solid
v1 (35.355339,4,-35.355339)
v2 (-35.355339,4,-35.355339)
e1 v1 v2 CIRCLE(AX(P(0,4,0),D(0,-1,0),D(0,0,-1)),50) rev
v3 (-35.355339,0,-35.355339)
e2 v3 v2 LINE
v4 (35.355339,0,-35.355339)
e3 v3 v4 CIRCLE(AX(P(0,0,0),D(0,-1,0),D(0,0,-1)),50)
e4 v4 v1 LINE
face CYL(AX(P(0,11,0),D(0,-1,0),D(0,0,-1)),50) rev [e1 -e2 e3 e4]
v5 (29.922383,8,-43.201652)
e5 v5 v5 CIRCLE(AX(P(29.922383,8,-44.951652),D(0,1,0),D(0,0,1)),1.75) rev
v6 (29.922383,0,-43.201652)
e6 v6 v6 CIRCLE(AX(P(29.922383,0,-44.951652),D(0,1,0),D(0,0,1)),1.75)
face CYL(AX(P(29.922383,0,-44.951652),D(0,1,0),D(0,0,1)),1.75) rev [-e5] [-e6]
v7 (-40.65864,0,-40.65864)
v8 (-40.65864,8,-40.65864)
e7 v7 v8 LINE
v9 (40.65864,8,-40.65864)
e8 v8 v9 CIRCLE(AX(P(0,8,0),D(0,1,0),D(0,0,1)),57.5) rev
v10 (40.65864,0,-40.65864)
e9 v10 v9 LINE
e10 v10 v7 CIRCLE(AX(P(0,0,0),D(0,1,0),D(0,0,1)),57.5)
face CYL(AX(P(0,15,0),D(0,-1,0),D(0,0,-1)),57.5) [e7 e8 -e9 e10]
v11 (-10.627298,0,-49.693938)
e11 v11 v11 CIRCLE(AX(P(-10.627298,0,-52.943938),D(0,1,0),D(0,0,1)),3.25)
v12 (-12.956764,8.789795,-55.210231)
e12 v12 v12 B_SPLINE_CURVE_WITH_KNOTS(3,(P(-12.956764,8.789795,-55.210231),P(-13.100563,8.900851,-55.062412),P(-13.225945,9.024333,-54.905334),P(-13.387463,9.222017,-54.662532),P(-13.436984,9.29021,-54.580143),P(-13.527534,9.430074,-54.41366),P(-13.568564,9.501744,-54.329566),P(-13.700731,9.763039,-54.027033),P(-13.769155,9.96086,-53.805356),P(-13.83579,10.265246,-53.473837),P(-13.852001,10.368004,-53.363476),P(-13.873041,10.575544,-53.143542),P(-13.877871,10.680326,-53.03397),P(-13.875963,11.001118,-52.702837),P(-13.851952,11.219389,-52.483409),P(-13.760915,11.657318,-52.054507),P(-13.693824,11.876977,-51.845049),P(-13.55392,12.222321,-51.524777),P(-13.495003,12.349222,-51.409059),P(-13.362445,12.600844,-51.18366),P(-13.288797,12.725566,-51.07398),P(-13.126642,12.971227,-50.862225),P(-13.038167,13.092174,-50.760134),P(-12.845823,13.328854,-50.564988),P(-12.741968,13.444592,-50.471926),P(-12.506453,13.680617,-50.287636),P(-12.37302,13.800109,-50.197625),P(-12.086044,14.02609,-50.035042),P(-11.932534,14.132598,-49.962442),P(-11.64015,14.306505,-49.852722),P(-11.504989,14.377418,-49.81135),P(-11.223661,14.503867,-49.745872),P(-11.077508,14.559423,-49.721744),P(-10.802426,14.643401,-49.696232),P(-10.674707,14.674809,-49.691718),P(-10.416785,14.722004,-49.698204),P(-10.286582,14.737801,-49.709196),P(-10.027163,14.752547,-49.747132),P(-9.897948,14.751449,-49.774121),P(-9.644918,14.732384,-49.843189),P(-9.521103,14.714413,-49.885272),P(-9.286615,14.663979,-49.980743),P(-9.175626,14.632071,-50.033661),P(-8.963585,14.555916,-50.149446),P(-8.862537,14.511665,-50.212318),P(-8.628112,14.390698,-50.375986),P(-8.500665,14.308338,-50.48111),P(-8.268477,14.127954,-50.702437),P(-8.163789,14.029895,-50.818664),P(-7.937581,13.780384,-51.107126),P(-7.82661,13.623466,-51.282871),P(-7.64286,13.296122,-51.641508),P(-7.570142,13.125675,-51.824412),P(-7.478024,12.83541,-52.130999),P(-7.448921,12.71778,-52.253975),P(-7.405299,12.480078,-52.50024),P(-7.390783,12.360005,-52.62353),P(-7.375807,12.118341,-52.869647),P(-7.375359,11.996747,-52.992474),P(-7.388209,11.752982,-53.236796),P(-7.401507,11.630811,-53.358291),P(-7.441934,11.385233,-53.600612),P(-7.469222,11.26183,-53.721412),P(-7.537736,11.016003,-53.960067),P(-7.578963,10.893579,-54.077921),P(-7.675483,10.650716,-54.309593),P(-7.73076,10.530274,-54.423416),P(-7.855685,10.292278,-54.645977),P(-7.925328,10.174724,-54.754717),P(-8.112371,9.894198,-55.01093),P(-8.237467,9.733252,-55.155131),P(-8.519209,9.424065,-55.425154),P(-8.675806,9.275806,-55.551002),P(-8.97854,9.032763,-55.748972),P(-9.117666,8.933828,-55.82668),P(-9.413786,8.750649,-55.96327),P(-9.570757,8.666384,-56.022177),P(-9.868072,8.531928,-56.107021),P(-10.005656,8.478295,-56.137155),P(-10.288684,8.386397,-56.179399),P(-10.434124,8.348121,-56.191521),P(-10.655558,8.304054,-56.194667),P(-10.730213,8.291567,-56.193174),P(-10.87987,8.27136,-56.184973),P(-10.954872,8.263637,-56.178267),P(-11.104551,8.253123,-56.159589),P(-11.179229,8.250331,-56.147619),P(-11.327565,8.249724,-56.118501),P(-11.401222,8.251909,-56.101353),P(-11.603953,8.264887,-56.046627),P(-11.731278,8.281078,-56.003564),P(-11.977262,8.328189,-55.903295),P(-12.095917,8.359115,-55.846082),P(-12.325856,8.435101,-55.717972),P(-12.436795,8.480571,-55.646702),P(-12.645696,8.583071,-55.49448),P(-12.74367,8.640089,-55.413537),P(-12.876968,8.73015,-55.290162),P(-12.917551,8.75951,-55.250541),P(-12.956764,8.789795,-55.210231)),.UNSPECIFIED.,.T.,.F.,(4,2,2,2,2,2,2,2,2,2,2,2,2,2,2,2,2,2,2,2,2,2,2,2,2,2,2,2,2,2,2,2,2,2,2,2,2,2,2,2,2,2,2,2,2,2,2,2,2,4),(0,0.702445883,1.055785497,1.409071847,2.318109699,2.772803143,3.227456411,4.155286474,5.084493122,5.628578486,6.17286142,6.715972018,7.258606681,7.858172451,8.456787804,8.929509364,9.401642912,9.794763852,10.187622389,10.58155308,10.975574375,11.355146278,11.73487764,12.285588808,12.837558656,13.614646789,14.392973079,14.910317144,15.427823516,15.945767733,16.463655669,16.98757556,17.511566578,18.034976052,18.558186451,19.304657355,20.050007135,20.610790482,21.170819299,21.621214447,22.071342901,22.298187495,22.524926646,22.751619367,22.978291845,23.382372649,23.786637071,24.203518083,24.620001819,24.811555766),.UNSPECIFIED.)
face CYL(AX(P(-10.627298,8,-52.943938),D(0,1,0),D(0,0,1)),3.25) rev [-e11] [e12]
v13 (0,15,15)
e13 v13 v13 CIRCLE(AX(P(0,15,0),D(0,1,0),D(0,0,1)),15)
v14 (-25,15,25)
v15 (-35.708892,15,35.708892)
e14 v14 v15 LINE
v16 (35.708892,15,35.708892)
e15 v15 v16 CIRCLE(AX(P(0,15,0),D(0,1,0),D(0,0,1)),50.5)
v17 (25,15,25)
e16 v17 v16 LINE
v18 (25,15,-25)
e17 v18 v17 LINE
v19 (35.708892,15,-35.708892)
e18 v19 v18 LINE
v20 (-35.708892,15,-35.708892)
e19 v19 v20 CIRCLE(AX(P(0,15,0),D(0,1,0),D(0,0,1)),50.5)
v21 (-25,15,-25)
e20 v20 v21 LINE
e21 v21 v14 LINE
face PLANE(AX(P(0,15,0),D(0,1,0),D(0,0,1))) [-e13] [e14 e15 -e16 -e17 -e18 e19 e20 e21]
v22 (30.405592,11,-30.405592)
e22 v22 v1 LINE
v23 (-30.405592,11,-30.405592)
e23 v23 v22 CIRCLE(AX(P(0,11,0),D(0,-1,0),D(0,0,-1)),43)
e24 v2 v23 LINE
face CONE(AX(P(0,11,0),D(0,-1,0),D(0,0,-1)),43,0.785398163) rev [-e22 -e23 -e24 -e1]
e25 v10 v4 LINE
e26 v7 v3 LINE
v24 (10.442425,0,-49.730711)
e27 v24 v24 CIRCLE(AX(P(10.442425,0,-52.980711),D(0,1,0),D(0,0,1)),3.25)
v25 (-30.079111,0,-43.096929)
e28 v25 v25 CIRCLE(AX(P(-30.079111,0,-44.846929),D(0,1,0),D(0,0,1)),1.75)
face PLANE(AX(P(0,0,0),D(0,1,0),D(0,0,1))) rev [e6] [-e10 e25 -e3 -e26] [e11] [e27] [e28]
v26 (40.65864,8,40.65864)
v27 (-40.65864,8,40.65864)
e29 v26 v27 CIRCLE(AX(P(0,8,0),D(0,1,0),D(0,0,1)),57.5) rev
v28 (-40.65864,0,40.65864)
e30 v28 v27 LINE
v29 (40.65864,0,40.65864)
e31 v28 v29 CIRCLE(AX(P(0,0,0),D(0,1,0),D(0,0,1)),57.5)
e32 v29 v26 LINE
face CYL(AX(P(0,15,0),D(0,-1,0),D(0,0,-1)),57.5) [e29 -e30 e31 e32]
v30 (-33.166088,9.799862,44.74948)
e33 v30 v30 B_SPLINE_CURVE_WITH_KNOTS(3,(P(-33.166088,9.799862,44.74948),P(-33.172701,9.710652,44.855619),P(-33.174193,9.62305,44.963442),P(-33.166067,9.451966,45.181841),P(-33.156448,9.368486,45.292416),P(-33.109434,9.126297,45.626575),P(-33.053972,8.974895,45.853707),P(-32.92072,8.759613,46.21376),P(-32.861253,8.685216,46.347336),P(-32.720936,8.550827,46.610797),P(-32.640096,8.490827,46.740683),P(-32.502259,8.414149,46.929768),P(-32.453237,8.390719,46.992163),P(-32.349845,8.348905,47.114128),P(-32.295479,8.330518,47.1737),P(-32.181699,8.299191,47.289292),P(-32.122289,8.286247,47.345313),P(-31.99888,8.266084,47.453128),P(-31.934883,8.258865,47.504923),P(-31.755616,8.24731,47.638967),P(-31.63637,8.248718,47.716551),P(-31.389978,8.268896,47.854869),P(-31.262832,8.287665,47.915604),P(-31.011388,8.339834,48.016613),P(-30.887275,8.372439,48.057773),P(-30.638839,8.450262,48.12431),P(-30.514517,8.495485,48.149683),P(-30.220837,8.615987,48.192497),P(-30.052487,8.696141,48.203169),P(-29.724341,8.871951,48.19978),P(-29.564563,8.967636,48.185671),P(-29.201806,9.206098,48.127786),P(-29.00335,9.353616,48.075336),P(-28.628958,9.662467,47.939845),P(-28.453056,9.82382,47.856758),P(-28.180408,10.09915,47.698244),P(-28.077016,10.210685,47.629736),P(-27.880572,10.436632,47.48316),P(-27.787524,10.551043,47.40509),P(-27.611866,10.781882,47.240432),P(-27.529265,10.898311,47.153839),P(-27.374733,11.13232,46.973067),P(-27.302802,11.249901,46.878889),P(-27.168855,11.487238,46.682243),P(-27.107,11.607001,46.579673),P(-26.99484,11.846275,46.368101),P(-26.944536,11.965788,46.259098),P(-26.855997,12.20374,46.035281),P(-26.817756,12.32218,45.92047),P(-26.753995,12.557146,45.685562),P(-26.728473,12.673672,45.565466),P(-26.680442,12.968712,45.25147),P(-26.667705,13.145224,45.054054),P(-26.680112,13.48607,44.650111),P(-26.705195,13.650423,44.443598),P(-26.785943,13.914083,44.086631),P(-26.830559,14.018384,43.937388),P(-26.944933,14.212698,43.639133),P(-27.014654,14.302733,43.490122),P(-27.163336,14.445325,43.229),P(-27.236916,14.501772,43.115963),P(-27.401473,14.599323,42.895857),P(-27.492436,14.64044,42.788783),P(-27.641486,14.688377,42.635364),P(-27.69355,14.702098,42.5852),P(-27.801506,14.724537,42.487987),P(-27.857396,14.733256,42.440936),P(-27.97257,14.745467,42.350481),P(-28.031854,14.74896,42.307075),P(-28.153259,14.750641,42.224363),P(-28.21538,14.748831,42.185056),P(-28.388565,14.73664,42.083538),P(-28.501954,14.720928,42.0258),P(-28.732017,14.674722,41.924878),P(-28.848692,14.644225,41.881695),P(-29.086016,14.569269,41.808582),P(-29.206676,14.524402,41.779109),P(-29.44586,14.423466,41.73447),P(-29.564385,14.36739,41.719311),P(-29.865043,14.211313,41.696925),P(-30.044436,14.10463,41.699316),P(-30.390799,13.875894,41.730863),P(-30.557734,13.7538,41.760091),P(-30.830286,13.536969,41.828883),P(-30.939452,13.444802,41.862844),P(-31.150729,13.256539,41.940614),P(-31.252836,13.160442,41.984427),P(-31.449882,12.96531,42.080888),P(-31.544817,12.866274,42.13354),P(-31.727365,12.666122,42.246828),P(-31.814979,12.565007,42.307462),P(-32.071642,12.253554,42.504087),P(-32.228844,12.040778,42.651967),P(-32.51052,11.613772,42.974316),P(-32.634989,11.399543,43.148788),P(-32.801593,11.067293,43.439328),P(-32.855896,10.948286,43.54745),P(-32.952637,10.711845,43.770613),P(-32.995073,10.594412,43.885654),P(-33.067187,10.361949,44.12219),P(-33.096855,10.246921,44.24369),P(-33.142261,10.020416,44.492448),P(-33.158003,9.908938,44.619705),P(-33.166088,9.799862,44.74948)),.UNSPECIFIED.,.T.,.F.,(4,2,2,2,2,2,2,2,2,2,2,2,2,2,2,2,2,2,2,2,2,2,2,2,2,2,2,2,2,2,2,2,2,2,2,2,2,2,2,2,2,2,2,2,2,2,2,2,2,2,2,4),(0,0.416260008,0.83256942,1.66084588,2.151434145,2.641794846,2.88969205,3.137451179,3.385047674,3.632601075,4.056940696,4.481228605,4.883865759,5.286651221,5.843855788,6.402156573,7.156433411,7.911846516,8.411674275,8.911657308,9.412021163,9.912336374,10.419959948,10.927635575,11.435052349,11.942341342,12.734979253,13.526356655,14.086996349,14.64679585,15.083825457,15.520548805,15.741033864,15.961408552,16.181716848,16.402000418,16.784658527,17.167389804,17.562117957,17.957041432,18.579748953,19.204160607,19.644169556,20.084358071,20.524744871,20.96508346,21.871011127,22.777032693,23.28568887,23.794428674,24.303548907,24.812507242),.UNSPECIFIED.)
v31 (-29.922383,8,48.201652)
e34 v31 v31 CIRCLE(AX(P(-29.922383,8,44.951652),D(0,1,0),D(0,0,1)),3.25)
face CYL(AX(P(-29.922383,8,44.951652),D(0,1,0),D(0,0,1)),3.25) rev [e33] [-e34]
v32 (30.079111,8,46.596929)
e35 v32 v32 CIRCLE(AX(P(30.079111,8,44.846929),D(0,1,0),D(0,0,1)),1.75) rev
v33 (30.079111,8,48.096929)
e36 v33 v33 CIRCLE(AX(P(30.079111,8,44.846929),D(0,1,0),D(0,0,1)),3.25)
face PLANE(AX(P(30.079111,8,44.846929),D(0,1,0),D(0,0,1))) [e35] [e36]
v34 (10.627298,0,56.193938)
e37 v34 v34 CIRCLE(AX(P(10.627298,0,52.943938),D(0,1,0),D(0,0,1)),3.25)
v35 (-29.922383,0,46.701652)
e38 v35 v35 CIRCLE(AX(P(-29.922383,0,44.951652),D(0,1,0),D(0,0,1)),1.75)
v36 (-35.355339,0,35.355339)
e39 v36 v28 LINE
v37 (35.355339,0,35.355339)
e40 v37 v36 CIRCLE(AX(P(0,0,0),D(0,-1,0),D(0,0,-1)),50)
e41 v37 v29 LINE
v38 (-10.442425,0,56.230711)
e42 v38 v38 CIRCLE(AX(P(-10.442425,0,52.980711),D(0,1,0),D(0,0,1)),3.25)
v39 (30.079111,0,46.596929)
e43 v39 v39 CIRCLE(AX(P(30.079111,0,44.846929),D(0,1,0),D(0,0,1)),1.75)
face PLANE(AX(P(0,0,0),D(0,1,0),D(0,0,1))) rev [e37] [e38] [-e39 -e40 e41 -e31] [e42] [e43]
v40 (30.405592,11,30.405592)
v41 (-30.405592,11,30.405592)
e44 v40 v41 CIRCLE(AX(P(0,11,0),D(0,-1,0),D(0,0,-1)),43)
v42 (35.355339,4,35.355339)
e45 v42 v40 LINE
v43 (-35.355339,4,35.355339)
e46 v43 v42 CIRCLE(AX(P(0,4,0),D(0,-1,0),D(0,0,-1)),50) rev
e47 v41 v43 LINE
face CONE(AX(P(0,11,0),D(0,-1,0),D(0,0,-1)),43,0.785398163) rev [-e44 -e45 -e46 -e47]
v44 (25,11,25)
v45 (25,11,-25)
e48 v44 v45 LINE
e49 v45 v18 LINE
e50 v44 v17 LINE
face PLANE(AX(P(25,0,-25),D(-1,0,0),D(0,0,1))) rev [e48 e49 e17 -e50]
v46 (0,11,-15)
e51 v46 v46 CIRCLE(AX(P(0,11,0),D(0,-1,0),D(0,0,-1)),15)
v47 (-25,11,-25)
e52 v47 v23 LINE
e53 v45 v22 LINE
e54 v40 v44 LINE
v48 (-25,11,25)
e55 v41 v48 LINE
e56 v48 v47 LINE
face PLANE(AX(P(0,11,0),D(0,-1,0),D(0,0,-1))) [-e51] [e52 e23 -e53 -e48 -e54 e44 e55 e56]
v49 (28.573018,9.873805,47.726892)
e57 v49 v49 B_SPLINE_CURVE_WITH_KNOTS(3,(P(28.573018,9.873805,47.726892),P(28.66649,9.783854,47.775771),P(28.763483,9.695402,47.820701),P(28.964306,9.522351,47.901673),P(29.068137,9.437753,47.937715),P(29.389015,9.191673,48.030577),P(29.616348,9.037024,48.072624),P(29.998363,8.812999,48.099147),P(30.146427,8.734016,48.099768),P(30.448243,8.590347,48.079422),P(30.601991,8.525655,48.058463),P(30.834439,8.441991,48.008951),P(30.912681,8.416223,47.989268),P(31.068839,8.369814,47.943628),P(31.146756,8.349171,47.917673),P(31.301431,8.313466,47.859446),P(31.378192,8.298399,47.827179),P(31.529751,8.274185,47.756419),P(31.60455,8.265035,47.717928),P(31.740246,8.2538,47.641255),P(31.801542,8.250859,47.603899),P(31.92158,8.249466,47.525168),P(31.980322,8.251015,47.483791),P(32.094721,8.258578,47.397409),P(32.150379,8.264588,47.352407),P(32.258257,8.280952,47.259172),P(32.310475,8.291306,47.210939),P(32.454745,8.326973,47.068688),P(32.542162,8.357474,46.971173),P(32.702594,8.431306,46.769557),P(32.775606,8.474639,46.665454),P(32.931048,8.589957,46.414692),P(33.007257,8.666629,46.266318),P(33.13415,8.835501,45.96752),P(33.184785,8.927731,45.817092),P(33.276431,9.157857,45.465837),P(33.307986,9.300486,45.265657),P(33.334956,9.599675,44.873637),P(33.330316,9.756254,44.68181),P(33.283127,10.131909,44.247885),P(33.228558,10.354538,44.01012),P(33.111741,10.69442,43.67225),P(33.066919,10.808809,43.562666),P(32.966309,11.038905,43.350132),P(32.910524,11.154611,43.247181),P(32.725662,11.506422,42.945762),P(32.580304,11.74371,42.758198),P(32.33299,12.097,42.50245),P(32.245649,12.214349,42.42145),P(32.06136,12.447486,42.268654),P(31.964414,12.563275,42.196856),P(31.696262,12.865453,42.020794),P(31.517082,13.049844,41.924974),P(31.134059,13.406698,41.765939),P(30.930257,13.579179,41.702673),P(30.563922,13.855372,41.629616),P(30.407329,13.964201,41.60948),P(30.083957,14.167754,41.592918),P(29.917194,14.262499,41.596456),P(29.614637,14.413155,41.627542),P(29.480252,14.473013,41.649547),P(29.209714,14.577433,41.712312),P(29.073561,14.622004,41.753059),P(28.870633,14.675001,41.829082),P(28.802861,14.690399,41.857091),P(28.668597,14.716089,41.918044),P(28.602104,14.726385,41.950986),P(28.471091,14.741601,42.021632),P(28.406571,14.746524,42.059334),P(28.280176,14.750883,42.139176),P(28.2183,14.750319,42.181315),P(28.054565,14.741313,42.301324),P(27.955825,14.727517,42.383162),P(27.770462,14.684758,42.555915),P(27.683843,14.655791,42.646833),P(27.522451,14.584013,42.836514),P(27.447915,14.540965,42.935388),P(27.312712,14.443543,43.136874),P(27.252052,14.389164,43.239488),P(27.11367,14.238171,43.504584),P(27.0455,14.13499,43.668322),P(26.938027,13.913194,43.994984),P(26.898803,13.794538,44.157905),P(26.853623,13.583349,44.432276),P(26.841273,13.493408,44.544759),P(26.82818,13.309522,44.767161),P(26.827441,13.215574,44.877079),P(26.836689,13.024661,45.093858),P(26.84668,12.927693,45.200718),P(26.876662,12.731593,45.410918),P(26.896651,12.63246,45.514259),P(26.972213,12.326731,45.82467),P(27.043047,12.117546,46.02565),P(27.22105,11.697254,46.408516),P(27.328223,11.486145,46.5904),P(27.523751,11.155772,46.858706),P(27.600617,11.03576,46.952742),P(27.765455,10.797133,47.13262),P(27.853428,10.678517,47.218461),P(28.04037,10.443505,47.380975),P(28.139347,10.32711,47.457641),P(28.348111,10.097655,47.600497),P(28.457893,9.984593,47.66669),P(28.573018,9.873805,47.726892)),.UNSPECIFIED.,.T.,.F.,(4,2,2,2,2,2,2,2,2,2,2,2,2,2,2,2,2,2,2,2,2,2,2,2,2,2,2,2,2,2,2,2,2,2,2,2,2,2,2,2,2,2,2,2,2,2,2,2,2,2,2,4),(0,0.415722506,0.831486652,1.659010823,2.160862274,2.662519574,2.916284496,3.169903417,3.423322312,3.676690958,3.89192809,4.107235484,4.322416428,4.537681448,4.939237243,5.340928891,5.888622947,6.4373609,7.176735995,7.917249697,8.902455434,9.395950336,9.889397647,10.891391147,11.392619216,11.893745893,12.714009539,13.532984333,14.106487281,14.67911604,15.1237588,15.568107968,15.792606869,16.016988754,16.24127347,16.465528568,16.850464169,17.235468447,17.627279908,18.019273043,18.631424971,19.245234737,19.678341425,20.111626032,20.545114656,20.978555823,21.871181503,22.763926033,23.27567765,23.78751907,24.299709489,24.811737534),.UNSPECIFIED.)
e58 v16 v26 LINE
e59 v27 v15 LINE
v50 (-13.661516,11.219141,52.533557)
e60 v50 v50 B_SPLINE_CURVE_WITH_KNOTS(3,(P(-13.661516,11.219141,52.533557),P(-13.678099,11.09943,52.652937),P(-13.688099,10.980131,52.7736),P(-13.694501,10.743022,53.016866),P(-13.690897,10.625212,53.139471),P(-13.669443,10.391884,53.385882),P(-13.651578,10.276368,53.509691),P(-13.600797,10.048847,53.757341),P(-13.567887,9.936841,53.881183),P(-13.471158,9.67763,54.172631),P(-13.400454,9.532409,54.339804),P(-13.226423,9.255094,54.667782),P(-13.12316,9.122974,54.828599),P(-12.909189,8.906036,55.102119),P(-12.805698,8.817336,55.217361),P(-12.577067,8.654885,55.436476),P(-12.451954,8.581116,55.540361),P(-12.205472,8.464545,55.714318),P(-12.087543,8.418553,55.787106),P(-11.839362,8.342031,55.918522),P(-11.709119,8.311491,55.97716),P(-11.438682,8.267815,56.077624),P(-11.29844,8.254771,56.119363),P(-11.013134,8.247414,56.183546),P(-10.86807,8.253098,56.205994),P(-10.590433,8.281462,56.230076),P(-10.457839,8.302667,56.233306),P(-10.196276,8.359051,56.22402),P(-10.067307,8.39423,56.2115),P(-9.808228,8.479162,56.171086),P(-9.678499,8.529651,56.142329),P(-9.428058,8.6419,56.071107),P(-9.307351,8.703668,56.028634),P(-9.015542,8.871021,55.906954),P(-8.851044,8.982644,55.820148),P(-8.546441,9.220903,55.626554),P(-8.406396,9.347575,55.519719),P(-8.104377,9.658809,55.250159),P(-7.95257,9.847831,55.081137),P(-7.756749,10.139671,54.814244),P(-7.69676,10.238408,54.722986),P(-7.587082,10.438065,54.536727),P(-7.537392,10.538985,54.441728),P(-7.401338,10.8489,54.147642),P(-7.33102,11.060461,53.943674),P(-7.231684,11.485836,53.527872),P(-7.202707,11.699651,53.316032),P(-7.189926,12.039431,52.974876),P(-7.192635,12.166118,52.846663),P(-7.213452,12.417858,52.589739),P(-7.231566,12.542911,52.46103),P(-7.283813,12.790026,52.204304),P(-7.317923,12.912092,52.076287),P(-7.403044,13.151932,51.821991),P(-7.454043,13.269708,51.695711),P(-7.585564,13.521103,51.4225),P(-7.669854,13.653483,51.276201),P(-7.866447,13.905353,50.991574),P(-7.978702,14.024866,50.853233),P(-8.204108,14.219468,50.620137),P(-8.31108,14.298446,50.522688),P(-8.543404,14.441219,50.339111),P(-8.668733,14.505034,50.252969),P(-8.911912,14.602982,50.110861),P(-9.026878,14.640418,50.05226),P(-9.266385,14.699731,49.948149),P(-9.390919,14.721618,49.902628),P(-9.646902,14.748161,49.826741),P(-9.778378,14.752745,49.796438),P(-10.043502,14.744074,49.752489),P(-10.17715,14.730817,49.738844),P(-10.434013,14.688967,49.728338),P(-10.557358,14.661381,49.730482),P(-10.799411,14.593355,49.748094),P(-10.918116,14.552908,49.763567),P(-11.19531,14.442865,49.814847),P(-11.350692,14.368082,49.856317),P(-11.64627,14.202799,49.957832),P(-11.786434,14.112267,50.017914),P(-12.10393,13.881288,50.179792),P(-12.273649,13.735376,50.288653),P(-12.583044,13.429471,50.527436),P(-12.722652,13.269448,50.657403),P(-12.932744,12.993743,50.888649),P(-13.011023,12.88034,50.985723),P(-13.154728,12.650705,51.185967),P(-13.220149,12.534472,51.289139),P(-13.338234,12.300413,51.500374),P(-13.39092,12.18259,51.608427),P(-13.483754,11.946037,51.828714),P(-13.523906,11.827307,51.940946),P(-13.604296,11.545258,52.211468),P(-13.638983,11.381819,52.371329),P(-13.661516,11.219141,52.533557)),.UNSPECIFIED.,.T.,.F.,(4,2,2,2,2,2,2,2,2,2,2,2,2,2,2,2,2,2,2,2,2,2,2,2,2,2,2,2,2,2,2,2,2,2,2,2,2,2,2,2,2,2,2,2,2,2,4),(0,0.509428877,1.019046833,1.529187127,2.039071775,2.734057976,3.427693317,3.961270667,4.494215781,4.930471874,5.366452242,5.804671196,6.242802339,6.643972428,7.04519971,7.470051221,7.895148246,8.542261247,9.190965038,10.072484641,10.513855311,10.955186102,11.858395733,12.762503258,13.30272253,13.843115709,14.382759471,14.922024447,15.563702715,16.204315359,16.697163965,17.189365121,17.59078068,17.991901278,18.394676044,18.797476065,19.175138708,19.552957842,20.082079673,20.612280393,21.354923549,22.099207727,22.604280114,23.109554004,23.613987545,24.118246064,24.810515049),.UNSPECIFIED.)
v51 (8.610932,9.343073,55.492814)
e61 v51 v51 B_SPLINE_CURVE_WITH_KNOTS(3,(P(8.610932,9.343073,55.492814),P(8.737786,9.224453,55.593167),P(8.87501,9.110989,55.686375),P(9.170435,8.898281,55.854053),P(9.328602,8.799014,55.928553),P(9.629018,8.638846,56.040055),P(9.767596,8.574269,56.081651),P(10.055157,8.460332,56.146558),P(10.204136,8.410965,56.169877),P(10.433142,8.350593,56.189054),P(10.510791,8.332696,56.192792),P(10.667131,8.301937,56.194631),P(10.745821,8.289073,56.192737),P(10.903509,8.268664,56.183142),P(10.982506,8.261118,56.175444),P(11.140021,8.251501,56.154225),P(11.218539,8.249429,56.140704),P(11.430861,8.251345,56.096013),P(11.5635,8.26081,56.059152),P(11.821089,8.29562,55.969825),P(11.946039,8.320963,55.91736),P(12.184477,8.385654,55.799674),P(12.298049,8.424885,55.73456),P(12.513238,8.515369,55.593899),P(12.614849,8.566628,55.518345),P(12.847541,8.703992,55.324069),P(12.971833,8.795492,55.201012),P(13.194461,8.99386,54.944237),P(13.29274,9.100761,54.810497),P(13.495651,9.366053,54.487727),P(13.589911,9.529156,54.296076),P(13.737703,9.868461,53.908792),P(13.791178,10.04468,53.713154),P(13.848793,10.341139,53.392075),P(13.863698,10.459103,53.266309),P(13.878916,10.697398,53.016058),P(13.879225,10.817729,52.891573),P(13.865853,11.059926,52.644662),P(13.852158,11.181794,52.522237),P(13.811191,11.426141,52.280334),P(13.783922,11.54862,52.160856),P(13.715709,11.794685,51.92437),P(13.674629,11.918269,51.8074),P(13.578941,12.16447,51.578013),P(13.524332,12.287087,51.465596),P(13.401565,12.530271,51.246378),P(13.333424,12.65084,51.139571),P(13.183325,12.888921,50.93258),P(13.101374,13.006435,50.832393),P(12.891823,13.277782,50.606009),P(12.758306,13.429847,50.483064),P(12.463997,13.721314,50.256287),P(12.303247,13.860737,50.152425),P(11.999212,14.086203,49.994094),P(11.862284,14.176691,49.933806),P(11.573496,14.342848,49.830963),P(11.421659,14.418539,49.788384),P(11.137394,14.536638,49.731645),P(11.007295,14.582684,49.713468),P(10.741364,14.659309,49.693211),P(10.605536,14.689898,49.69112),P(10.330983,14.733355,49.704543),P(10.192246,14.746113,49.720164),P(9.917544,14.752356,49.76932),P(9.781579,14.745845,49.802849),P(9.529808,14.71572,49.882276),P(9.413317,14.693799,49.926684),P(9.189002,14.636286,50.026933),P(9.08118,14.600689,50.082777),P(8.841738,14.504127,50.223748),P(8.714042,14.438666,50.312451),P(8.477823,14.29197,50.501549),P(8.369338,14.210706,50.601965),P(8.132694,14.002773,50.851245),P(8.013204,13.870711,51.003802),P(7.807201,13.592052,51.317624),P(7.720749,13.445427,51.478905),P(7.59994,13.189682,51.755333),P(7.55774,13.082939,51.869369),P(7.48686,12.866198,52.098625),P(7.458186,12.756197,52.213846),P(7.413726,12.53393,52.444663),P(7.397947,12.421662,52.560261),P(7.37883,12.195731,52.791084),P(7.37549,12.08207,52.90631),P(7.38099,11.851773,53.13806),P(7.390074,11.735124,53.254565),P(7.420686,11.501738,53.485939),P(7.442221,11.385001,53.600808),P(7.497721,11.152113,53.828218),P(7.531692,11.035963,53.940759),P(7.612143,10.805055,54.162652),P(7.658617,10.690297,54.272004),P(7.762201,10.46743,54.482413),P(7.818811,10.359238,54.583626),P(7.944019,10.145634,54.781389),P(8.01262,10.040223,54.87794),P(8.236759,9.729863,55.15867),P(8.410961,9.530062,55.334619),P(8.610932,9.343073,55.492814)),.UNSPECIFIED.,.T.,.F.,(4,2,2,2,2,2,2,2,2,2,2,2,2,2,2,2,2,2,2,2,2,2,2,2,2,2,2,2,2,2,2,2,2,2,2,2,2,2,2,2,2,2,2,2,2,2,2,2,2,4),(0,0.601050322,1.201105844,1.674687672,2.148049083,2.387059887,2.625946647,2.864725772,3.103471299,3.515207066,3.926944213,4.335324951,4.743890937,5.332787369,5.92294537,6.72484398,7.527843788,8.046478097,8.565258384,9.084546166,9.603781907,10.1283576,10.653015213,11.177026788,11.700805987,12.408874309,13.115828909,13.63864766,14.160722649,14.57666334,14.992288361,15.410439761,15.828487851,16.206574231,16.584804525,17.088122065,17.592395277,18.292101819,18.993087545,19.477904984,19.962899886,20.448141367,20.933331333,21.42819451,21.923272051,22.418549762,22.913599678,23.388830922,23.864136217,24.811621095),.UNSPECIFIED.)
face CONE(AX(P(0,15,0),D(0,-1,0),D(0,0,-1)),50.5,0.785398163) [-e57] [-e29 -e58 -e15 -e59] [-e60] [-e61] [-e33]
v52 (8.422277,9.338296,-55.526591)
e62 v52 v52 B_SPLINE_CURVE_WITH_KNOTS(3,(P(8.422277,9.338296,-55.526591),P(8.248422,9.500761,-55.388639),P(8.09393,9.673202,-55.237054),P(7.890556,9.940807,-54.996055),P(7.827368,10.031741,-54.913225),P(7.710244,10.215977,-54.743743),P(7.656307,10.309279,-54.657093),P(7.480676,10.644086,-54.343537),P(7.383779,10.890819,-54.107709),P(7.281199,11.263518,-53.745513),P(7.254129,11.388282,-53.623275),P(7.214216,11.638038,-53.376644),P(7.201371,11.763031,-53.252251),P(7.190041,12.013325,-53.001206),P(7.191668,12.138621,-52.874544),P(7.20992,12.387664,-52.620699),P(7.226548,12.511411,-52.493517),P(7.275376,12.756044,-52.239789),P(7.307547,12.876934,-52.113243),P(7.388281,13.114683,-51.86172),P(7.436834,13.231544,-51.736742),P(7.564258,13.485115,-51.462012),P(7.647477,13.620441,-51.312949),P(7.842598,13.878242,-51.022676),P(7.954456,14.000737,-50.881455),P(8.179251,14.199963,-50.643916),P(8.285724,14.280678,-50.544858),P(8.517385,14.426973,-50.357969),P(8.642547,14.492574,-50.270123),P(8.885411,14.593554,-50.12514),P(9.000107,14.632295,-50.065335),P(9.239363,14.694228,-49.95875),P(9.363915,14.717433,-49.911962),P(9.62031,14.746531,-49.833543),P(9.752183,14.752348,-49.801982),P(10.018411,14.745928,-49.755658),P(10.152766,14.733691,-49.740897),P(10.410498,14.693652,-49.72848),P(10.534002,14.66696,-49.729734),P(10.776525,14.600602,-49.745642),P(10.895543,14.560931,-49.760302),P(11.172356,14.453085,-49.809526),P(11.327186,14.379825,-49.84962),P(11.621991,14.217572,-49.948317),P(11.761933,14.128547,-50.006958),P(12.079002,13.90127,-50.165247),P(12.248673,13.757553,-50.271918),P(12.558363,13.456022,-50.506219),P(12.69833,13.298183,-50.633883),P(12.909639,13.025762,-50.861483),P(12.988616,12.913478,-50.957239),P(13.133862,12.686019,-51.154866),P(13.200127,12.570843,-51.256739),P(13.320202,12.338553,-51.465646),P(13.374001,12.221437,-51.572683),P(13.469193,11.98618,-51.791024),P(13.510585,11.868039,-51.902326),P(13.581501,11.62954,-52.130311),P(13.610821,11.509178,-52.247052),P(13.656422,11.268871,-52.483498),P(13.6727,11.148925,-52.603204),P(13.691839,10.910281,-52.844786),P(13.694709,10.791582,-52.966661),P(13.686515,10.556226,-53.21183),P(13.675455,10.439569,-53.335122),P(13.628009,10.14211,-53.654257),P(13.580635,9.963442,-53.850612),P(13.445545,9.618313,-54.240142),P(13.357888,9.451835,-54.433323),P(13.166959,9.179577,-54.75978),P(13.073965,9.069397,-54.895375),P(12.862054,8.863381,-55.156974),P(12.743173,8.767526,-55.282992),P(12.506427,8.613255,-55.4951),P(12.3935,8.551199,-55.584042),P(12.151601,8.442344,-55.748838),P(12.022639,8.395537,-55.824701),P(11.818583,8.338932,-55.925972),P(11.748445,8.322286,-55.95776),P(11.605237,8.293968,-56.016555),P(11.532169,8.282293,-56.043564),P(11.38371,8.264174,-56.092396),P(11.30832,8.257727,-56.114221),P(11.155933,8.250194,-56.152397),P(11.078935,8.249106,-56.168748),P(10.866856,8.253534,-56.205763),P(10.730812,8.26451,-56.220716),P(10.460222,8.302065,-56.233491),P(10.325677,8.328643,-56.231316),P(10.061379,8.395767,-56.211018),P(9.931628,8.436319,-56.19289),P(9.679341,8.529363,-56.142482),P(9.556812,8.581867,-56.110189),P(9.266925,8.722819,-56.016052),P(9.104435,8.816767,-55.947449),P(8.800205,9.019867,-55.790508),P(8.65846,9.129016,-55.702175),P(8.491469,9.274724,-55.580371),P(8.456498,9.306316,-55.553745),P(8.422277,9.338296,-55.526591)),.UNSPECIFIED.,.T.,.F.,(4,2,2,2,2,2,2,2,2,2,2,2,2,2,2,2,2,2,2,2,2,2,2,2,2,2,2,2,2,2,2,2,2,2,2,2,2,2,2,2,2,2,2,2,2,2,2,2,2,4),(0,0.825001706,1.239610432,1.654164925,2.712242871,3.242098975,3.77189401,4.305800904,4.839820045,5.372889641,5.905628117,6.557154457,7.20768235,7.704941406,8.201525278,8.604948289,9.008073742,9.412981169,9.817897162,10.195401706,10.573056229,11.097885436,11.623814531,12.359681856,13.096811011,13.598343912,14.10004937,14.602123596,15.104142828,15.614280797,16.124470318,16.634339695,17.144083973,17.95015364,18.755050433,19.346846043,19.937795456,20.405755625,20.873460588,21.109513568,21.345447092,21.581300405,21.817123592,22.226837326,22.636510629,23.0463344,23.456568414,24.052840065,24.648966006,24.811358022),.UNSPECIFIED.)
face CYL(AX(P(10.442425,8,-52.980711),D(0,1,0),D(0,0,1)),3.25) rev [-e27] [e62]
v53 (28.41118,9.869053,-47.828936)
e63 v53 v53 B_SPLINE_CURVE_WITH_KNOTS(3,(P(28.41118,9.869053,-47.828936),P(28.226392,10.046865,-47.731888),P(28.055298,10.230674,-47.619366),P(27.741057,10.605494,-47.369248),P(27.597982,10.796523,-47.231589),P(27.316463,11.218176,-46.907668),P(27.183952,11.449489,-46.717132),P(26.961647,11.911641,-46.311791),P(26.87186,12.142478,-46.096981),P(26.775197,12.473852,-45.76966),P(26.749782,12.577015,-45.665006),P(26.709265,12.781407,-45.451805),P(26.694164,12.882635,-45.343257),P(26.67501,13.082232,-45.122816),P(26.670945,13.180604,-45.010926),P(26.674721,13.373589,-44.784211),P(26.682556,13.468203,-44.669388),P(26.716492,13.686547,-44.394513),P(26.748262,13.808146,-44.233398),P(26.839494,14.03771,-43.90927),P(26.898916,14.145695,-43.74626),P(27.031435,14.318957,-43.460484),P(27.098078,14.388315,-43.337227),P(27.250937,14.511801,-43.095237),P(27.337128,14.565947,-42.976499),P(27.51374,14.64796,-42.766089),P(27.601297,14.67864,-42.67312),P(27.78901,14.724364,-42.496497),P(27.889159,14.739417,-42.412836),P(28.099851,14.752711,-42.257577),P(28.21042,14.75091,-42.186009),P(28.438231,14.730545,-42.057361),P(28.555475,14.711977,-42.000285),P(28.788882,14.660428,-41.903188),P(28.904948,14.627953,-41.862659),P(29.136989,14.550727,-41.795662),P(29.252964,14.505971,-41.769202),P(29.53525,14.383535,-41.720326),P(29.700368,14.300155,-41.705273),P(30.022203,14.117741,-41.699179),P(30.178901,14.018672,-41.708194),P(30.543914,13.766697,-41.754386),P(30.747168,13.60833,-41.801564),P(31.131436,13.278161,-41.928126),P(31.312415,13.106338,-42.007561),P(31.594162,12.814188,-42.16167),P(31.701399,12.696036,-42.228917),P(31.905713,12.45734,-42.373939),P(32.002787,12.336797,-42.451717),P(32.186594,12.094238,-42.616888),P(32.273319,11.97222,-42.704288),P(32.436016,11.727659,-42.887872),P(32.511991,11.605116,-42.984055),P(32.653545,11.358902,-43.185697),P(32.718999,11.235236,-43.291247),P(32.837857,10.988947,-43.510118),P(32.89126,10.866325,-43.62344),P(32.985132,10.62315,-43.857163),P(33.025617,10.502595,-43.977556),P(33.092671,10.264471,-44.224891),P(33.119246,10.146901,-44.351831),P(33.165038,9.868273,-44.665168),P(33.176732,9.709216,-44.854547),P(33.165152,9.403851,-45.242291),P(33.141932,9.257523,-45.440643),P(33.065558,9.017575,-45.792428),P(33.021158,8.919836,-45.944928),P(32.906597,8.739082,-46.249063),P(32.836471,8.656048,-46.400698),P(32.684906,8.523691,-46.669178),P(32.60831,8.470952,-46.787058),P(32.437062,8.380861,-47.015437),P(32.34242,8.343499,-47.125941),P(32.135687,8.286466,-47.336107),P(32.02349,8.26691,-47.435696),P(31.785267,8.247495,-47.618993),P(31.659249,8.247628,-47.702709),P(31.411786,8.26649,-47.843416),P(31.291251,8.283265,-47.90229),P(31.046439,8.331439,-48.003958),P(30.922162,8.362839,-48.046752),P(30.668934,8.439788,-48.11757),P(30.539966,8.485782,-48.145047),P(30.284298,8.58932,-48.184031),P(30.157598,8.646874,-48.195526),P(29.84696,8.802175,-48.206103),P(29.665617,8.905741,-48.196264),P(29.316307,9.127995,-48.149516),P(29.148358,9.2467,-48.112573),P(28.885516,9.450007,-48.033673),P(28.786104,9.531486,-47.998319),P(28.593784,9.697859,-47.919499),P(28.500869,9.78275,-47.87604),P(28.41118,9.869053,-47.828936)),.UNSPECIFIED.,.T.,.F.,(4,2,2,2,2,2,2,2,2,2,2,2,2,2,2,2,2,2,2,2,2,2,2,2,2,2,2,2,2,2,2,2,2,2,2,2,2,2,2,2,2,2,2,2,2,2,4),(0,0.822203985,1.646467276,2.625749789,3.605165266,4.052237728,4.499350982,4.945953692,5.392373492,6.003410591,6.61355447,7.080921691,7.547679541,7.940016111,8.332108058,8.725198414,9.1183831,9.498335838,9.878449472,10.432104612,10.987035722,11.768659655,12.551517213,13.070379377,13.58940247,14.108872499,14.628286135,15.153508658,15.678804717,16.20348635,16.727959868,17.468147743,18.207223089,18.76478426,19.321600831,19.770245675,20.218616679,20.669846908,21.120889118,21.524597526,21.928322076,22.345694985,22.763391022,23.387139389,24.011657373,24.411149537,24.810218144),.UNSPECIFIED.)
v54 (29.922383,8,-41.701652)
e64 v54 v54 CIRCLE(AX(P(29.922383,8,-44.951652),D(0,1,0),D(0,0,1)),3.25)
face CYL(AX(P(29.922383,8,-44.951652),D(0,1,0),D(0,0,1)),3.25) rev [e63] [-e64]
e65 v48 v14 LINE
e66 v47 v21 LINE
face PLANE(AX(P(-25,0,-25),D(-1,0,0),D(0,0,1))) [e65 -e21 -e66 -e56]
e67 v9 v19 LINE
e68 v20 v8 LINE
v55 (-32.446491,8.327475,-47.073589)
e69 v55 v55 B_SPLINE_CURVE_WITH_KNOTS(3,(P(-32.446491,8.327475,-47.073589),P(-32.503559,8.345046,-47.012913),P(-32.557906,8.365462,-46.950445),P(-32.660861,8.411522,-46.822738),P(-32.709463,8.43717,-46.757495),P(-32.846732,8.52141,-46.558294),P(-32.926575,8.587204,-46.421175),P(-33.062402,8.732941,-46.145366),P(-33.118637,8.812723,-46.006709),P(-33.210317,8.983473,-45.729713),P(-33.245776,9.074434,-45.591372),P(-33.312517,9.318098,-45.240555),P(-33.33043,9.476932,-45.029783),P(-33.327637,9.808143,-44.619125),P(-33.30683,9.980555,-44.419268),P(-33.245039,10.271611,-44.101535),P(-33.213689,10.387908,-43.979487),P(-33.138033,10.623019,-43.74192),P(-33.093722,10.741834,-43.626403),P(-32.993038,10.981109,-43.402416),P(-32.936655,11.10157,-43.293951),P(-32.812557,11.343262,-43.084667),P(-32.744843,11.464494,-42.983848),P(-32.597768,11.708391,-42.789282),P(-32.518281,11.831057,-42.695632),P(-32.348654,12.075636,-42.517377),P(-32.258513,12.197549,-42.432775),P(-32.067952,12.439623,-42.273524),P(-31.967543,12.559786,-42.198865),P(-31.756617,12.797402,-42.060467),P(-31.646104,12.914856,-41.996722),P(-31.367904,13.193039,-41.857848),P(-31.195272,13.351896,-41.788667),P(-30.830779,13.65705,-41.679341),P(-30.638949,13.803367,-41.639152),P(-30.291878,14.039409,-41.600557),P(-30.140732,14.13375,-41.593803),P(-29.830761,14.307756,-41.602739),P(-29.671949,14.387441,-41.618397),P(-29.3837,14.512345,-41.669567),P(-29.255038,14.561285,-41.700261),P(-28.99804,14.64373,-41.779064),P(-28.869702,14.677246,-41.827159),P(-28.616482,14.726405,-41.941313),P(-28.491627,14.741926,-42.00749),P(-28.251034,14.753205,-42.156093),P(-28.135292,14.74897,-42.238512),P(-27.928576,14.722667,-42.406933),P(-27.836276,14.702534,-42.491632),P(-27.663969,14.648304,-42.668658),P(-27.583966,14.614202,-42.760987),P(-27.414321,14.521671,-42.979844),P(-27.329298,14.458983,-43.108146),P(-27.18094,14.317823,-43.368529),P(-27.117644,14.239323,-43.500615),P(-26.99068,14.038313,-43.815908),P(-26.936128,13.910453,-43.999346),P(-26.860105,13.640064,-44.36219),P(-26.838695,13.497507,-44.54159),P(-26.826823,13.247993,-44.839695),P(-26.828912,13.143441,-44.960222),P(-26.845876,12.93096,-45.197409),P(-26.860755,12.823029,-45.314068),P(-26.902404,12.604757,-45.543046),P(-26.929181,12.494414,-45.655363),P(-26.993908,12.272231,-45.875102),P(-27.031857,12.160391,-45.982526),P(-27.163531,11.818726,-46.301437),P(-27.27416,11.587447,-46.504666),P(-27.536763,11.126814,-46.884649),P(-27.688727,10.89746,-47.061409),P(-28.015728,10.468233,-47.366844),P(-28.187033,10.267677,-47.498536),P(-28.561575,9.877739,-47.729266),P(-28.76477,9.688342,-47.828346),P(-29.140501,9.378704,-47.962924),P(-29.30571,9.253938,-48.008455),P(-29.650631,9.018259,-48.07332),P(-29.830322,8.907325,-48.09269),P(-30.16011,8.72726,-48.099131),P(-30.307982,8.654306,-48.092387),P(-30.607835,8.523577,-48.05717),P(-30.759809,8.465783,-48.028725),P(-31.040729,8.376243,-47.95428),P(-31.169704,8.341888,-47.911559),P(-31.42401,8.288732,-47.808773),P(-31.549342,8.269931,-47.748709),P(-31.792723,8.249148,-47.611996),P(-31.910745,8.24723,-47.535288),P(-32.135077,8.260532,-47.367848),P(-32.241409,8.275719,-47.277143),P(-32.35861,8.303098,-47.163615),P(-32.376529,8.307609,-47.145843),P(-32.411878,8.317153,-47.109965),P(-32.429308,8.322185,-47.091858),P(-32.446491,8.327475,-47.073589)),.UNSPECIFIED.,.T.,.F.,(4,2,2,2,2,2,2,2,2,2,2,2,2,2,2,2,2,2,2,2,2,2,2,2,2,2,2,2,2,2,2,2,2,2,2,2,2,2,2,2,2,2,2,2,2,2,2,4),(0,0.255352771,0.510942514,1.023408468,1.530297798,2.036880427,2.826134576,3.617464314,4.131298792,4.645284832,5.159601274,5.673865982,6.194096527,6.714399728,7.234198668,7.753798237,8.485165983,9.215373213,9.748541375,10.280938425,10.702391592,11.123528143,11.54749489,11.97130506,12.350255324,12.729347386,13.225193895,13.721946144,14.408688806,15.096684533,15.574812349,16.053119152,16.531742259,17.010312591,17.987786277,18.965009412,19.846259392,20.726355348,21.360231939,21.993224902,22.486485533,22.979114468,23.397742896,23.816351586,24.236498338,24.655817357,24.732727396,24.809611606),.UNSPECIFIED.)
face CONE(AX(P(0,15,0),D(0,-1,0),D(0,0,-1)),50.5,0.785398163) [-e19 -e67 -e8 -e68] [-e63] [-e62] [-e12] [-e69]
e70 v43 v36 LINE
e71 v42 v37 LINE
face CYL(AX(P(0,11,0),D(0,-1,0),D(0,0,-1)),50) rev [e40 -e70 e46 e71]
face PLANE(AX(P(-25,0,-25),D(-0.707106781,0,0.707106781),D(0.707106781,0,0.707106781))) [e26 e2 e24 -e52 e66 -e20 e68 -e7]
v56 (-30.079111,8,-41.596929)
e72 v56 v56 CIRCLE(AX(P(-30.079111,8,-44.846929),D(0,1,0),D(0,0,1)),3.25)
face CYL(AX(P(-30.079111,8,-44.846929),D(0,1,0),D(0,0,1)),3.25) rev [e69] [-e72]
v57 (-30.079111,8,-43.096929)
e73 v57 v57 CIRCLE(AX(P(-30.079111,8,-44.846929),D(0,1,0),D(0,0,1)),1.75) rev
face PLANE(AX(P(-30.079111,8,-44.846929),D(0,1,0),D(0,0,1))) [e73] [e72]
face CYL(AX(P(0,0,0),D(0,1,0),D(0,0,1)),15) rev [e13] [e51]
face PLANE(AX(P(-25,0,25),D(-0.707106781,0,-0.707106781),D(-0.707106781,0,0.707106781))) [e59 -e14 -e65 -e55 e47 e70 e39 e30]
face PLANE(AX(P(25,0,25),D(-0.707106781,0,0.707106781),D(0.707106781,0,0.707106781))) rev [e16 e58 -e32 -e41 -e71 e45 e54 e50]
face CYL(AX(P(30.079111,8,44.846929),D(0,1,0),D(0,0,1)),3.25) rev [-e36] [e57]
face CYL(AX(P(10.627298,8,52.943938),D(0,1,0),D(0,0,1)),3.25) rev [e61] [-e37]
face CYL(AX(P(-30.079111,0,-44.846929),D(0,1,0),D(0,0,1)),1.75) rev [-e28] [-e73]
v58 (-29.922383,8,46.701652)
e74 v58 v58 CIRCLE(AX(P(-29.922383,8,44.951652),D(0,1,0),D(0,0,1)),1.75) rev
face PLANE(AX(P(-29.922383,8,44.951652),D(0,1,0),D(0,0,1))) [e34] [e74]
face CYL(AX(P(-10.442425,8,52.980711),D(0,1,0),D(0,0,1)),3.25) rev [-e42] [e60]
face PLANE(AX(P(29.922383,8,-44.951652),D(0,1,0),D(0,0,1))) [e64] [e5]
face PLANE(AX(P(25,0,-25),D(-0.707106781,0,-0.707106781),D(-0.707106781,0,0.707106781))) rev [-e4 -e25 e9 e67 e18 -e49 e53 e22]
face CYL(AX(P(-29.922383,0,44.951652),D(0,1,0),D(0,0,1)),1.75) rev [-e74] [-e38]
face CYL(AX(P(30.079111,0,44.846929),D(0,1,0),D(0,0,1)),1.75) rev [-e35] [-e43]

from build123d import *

# Parameters (mm, degrees)
SKETCH1_R           = 57.5
BOSS_EXTRUDE1_DEPTH = 15
SKETCH2_R           = 50
CUT_EXTRUDE1_DEPTH  = 11
SKETCH3_R           = 15
SKETCH3_R_2         = 1.75
CUT_EXTRUDE2_DEPTH  = 15
CUT_EXTRUDE3_START  = -15
CUT_EXTRUDE3_DEPTH  = 15
CHAMFER1_SIZE       = 7
SKETCH5_R           = 3.25
CUT_EXTRUDE4_DEPTH  = 7
SKETCH6_R           = 3.25
CUT_EXTRUDE5_DEPTH  = 55


with BuildPart() as part:
    # Sketch1 → Boss-Extrude1 (new body)
    with BuildSketch(Plane(origin=(0, 0, 0), x_dir=(1, 0, 0), z_dir=(0, 1, 0))):
        with Locations(Location((0, 0, 0), (0, 0, 270))):
            Circle(SKETCH1_R)
    extrude(amount=BOSS_EXTRUDE1_DEPTH)

    # Sketch2 → Cut-Extrude1 (cut)
    with BuildSketch(Plane.XZ):
        with Locations(Location((0, 0, 0), (0, 0, 270))):
            Circle(SKETCH2_R)
    extrude(amount=-CUT_EXTRUDE1_DEPTH, mode=Mode.SUBTRACT)

    # Sketch3 → Cut-Extrude2 (cut)
    with BuildSketch(Plane(origin=(0, 15, 0), x_dir=(1, 0, 0), z_dir=(0, 1, 0))):
        with Locations(Location((0, 0, 0), (0, 0, 270))):
            Circle(SKETCH3_R)
        with Locations(Location((-10.627298131, 52.943937655, 0), (0, 0, 270))):
            Circle(SKETCH3_R_2)
        with Locations(Location((10.442424555, 52.980711296, 0), (0, 0, 270))):
            Circle(SKETCH3_R_2)
        with Locations(Location((29.922382764, 44.951651913, 0), (0, 0, 270))):
            Circle(SKETCH3_R_2)
        with Locations(Location((44.846929444, 30.079111014, 0), (0, 0, 270))):
            Circle(SKETCH3_R_2)
        with Locations(Location((52.943937655, 10.627298131, 0), (0, 0, 270))):
            Circle(SKETCH3_R_2)
        with Locations(Location((52.980711296, -10.442424555, 0), (0, 0, 270))):
            Circle(SKETCH3_R_2)
        with Locations(Location((44.951651913, -29.922382764, 0), (0, 0, 270))):
            Circle(SKETCH3_R_2)
        with Locations(Location((30.079111014, -44.846929444, 0), (0, 0, 270))):
            Circle(SKETCH3_R_2)
        with Locations(Location((10.627298131, -52.943937655, 0), (0, 0, 270))):
            Circle(SKETCH3_R_2)
        with Locations(Location((-10.442424555, -52.980711296, 0), (0, 0, 270))):
            Circle(SKETCH3_R_2)
        with Locations(Location((-29.922382764, -44.951651913, 0), (0, 0, 270))):
            Circle(SKETCH3_R_2)
        with Locations(Location((-44.846929444, -30.079111014, 0), (0, 0, 270))):
            Circle(SKETCH3_R_2)
        with Locations(Location((-52.943937655, -10.627298131, 0), (0, 0, 270))):
            Circle(SKETCH3_R_2)
        with Locations(Location((-52.980711296, 10.442424555, 0), (0, 0, 270))):
            Circle(SKETCH3_R_2)
        with Locations(Location((-44.951651913, 29.922382764, 0), (0, 0, 270))):
            Circle(SKETCH3_R_2)
        with Locations(Location((-30.079111014, 44.846929444, 0), (0, 0, 270))):
            Circle(SKETCH3_R_2)
    extrude(amount=-CUT_EXTRUDE2_DEPTH, mode=Mode.SUBTRACT)

    # Sketch4 → Cut-Extrude3 (cut)
    with BuildSketch(Plane(origin=(0, 15, 0), x_dir=(1, 0, 0), z_dir=(0, 1, 0)).offset(CUT_EXTRUDE3_START)):
        with BuildLine():
            Line((25, 25), (40.658639918, 40.658639918))
            ThreePointArc((40.658639918, 40.658639918), (57.5, 0), (40.658639918, -40.658639918))
            Line((40.658639918, -40.658639918), (25, -25))
            Line((25, -25), (25, 25))
        make_face()
    cut_extrude3 = extrude(amount=CUT_EXTRUDE3_DEPTH, mode=Mode.SUBTRACT)

    # Mirror1: Cut-Extrude3 across plane
    add(cut_extrude3.mirror(Plane(origin=(0, 0, 0), x_dir=(0, 0, 1), z_dir=(1, 0, 0))), mode=Mode.SUBTRACT)

    # Chamfer1
    # the kernel refuses this chamfer: 7 mm, written as the material it adds along each edge
    with BuildSketch(Plane(origin=(0, 11, 0), x_dir=(0.7071067811865475, 0, -0.7071067811865477), z_dir=(0.7071067811865477, 0, 0.7071067811865475))) as chamfer1_piece_1:
        Polygon((50, -CHAMFER1_SIZE), (50 - CHAMFER1_SIZE, 0), (50, 0), align=None)
    revolve(axis=Axis((0, 11, 0), (0, 1, 0)), revolution_arc=90)
    with BuildSketch(Plane(origin=(0, 11, 0), x_dir=(-0.7071067811865476, 0, 0.7071067811865476), z_dir=(-0.7071067811865476, 0, -0.7071067811865476))) as chamfer1_piece_2:
        Polygon((50 - CHAMFER1_SIZE, 0), (50, -CHAMFER1_SIZE), (50, 0), align=None)
    revolve(axis=Axis((0, 11, 0), (0, 1, 0)), revolution_arc=90)
    # the kernel refuses this chamfer: 7 mm, written as the material it takes off along each edge
    with BuildSketch(Plane(origin=(0, 15, 0), x_dir=(0.890570714861766, 0, 0.4548448107108656), z_dir=(0.4548448107108656, 0, -0.890570714861766))) as chamfer1_2_piece_1:
        Polygon((57.5 - CHAMFER1_SIZE, 0), (57.5, CHAMFER1_SIZE), (57.5, 0), align=None)
    revolve(axis=Axis((0, 15, 0), (0, -1, 0)), revolution_arc=125.890100955, mode=Mode.SUBTRACT)
    with BuildSketch(Plane(origin=(0, 15, 0), x_dir=(-0.890570714861766, 0, -0.4548448107108656), z_dir=(-0.4548448107108656, 0, 0.890570714861766))) as chamfer1_2_piece_2:
        Polygon((57.5, CHAMFER1_SIZE), (57.5 - CHAMFER1_SIZE, 0), (57.5, 0), align=None)
    revolve(axis=Axis((0, 15, 0), (0, -1, 0)), revolution_arc=125.890100955, mode=Mode.SUBTRACT)

    # Sketch5 → Cut-Extrude4 (cut)
    with BuildSketch(Plane(origin=(0, 15, 0), x_dir=(1, 0, 0), z_dir=(0, 1, 0))):
        with Locations(Location((-10.627298131, 52.943937655, 0), (0, 0, 270))):
            Circle(SKETCH5_R)
        with Locations(Location((10.442424555, 52.980711296, 0), (0, 0, 270))):
            Circle(SKETCH5_R)
        with Locations(Location((29.922382764, 44.951651913, 0), (0, 0, 270))):
            Circle(SKETCH5_R)
        with Locations((44.846929444, 30.079111014)):
            Circle(SKETCH5_R)
        with Locations((52.943937655, 10.627298131)):
            Circle(SKETCH5_R)
        with Locations((52.980711296, -10.442424555)):
            Circle(SKETCH5_R)
        with Locations((44.951651913, -29.922382764)):
            Circle(SKETCH5_R)
        with Locations(Location((30.079111014, -44.846929444, 0), (0, 0, 270))):
            Circle(SKETCH5_R)
        with Locations(Location((10.627298131, -52.943937655, 0), (0, 0, 270))):
            Circle(SKETCH5_R)
        with Locations(Location((-10.442424555, -52.980711296, 0), (0, 0, 270))):
            Circle(SKETCH5_R)
        with Locations(Location((-29.922382764, -44.951651913, 0), (0, 0, 270))):
            Circle(SKETCH5_R)
        with Locations((-44.846929444, -30.079111014)):
            Circle(SKETCH5_R)
        with Locations((-52.943937655, -10.627298131)):
            Circle(SKETCH5_R)
        with Locations((-52.980711296, 10.442424555)):
            Circle(SKETCH5_R)
        with Locations((-44.951651913, 29.922382764)):
            Circle(SKETCH5_R)
        with Locations(Location((-30.079111014, 44.846929444, 0), (0, 0, 270))):
            Circle(SKETCH5_R)
    extrude(amount=-CUT_EXTRUDE4_DEPTH, mode=Mode.SUBTRACT)

    # Sketch6 → Cut-Extrude5 (cut)
    with BuildSketch(Plane(origin=(0, 15, 0), x_dir=(1, 0, 0), z_dir=(0, 1, 0))):
        with Locations(Location((-10.627298131, 52.943937655, 0), (0, 0, 270))):
            Circle(SKETCH6_R)
        with Locations(Location((10.442424555, 52.980711296, 0), (0, 0, 270))):
            Circle(SKETCH6_R)
        with Locations(Location((-10.442424555, -52.980711296, 0), (0, 0, 270))):
            Circle(SKETCH6_R)
        with Locations(Location((10.627298131, -52.943937655, 0), (0, 0, 270))):
            Circle(SKETCH6_R)
    extrude(amount=-CUT_EXTRUDE5_DEPTH, mode=Mode.SUBTRACT)


solid = part.part
